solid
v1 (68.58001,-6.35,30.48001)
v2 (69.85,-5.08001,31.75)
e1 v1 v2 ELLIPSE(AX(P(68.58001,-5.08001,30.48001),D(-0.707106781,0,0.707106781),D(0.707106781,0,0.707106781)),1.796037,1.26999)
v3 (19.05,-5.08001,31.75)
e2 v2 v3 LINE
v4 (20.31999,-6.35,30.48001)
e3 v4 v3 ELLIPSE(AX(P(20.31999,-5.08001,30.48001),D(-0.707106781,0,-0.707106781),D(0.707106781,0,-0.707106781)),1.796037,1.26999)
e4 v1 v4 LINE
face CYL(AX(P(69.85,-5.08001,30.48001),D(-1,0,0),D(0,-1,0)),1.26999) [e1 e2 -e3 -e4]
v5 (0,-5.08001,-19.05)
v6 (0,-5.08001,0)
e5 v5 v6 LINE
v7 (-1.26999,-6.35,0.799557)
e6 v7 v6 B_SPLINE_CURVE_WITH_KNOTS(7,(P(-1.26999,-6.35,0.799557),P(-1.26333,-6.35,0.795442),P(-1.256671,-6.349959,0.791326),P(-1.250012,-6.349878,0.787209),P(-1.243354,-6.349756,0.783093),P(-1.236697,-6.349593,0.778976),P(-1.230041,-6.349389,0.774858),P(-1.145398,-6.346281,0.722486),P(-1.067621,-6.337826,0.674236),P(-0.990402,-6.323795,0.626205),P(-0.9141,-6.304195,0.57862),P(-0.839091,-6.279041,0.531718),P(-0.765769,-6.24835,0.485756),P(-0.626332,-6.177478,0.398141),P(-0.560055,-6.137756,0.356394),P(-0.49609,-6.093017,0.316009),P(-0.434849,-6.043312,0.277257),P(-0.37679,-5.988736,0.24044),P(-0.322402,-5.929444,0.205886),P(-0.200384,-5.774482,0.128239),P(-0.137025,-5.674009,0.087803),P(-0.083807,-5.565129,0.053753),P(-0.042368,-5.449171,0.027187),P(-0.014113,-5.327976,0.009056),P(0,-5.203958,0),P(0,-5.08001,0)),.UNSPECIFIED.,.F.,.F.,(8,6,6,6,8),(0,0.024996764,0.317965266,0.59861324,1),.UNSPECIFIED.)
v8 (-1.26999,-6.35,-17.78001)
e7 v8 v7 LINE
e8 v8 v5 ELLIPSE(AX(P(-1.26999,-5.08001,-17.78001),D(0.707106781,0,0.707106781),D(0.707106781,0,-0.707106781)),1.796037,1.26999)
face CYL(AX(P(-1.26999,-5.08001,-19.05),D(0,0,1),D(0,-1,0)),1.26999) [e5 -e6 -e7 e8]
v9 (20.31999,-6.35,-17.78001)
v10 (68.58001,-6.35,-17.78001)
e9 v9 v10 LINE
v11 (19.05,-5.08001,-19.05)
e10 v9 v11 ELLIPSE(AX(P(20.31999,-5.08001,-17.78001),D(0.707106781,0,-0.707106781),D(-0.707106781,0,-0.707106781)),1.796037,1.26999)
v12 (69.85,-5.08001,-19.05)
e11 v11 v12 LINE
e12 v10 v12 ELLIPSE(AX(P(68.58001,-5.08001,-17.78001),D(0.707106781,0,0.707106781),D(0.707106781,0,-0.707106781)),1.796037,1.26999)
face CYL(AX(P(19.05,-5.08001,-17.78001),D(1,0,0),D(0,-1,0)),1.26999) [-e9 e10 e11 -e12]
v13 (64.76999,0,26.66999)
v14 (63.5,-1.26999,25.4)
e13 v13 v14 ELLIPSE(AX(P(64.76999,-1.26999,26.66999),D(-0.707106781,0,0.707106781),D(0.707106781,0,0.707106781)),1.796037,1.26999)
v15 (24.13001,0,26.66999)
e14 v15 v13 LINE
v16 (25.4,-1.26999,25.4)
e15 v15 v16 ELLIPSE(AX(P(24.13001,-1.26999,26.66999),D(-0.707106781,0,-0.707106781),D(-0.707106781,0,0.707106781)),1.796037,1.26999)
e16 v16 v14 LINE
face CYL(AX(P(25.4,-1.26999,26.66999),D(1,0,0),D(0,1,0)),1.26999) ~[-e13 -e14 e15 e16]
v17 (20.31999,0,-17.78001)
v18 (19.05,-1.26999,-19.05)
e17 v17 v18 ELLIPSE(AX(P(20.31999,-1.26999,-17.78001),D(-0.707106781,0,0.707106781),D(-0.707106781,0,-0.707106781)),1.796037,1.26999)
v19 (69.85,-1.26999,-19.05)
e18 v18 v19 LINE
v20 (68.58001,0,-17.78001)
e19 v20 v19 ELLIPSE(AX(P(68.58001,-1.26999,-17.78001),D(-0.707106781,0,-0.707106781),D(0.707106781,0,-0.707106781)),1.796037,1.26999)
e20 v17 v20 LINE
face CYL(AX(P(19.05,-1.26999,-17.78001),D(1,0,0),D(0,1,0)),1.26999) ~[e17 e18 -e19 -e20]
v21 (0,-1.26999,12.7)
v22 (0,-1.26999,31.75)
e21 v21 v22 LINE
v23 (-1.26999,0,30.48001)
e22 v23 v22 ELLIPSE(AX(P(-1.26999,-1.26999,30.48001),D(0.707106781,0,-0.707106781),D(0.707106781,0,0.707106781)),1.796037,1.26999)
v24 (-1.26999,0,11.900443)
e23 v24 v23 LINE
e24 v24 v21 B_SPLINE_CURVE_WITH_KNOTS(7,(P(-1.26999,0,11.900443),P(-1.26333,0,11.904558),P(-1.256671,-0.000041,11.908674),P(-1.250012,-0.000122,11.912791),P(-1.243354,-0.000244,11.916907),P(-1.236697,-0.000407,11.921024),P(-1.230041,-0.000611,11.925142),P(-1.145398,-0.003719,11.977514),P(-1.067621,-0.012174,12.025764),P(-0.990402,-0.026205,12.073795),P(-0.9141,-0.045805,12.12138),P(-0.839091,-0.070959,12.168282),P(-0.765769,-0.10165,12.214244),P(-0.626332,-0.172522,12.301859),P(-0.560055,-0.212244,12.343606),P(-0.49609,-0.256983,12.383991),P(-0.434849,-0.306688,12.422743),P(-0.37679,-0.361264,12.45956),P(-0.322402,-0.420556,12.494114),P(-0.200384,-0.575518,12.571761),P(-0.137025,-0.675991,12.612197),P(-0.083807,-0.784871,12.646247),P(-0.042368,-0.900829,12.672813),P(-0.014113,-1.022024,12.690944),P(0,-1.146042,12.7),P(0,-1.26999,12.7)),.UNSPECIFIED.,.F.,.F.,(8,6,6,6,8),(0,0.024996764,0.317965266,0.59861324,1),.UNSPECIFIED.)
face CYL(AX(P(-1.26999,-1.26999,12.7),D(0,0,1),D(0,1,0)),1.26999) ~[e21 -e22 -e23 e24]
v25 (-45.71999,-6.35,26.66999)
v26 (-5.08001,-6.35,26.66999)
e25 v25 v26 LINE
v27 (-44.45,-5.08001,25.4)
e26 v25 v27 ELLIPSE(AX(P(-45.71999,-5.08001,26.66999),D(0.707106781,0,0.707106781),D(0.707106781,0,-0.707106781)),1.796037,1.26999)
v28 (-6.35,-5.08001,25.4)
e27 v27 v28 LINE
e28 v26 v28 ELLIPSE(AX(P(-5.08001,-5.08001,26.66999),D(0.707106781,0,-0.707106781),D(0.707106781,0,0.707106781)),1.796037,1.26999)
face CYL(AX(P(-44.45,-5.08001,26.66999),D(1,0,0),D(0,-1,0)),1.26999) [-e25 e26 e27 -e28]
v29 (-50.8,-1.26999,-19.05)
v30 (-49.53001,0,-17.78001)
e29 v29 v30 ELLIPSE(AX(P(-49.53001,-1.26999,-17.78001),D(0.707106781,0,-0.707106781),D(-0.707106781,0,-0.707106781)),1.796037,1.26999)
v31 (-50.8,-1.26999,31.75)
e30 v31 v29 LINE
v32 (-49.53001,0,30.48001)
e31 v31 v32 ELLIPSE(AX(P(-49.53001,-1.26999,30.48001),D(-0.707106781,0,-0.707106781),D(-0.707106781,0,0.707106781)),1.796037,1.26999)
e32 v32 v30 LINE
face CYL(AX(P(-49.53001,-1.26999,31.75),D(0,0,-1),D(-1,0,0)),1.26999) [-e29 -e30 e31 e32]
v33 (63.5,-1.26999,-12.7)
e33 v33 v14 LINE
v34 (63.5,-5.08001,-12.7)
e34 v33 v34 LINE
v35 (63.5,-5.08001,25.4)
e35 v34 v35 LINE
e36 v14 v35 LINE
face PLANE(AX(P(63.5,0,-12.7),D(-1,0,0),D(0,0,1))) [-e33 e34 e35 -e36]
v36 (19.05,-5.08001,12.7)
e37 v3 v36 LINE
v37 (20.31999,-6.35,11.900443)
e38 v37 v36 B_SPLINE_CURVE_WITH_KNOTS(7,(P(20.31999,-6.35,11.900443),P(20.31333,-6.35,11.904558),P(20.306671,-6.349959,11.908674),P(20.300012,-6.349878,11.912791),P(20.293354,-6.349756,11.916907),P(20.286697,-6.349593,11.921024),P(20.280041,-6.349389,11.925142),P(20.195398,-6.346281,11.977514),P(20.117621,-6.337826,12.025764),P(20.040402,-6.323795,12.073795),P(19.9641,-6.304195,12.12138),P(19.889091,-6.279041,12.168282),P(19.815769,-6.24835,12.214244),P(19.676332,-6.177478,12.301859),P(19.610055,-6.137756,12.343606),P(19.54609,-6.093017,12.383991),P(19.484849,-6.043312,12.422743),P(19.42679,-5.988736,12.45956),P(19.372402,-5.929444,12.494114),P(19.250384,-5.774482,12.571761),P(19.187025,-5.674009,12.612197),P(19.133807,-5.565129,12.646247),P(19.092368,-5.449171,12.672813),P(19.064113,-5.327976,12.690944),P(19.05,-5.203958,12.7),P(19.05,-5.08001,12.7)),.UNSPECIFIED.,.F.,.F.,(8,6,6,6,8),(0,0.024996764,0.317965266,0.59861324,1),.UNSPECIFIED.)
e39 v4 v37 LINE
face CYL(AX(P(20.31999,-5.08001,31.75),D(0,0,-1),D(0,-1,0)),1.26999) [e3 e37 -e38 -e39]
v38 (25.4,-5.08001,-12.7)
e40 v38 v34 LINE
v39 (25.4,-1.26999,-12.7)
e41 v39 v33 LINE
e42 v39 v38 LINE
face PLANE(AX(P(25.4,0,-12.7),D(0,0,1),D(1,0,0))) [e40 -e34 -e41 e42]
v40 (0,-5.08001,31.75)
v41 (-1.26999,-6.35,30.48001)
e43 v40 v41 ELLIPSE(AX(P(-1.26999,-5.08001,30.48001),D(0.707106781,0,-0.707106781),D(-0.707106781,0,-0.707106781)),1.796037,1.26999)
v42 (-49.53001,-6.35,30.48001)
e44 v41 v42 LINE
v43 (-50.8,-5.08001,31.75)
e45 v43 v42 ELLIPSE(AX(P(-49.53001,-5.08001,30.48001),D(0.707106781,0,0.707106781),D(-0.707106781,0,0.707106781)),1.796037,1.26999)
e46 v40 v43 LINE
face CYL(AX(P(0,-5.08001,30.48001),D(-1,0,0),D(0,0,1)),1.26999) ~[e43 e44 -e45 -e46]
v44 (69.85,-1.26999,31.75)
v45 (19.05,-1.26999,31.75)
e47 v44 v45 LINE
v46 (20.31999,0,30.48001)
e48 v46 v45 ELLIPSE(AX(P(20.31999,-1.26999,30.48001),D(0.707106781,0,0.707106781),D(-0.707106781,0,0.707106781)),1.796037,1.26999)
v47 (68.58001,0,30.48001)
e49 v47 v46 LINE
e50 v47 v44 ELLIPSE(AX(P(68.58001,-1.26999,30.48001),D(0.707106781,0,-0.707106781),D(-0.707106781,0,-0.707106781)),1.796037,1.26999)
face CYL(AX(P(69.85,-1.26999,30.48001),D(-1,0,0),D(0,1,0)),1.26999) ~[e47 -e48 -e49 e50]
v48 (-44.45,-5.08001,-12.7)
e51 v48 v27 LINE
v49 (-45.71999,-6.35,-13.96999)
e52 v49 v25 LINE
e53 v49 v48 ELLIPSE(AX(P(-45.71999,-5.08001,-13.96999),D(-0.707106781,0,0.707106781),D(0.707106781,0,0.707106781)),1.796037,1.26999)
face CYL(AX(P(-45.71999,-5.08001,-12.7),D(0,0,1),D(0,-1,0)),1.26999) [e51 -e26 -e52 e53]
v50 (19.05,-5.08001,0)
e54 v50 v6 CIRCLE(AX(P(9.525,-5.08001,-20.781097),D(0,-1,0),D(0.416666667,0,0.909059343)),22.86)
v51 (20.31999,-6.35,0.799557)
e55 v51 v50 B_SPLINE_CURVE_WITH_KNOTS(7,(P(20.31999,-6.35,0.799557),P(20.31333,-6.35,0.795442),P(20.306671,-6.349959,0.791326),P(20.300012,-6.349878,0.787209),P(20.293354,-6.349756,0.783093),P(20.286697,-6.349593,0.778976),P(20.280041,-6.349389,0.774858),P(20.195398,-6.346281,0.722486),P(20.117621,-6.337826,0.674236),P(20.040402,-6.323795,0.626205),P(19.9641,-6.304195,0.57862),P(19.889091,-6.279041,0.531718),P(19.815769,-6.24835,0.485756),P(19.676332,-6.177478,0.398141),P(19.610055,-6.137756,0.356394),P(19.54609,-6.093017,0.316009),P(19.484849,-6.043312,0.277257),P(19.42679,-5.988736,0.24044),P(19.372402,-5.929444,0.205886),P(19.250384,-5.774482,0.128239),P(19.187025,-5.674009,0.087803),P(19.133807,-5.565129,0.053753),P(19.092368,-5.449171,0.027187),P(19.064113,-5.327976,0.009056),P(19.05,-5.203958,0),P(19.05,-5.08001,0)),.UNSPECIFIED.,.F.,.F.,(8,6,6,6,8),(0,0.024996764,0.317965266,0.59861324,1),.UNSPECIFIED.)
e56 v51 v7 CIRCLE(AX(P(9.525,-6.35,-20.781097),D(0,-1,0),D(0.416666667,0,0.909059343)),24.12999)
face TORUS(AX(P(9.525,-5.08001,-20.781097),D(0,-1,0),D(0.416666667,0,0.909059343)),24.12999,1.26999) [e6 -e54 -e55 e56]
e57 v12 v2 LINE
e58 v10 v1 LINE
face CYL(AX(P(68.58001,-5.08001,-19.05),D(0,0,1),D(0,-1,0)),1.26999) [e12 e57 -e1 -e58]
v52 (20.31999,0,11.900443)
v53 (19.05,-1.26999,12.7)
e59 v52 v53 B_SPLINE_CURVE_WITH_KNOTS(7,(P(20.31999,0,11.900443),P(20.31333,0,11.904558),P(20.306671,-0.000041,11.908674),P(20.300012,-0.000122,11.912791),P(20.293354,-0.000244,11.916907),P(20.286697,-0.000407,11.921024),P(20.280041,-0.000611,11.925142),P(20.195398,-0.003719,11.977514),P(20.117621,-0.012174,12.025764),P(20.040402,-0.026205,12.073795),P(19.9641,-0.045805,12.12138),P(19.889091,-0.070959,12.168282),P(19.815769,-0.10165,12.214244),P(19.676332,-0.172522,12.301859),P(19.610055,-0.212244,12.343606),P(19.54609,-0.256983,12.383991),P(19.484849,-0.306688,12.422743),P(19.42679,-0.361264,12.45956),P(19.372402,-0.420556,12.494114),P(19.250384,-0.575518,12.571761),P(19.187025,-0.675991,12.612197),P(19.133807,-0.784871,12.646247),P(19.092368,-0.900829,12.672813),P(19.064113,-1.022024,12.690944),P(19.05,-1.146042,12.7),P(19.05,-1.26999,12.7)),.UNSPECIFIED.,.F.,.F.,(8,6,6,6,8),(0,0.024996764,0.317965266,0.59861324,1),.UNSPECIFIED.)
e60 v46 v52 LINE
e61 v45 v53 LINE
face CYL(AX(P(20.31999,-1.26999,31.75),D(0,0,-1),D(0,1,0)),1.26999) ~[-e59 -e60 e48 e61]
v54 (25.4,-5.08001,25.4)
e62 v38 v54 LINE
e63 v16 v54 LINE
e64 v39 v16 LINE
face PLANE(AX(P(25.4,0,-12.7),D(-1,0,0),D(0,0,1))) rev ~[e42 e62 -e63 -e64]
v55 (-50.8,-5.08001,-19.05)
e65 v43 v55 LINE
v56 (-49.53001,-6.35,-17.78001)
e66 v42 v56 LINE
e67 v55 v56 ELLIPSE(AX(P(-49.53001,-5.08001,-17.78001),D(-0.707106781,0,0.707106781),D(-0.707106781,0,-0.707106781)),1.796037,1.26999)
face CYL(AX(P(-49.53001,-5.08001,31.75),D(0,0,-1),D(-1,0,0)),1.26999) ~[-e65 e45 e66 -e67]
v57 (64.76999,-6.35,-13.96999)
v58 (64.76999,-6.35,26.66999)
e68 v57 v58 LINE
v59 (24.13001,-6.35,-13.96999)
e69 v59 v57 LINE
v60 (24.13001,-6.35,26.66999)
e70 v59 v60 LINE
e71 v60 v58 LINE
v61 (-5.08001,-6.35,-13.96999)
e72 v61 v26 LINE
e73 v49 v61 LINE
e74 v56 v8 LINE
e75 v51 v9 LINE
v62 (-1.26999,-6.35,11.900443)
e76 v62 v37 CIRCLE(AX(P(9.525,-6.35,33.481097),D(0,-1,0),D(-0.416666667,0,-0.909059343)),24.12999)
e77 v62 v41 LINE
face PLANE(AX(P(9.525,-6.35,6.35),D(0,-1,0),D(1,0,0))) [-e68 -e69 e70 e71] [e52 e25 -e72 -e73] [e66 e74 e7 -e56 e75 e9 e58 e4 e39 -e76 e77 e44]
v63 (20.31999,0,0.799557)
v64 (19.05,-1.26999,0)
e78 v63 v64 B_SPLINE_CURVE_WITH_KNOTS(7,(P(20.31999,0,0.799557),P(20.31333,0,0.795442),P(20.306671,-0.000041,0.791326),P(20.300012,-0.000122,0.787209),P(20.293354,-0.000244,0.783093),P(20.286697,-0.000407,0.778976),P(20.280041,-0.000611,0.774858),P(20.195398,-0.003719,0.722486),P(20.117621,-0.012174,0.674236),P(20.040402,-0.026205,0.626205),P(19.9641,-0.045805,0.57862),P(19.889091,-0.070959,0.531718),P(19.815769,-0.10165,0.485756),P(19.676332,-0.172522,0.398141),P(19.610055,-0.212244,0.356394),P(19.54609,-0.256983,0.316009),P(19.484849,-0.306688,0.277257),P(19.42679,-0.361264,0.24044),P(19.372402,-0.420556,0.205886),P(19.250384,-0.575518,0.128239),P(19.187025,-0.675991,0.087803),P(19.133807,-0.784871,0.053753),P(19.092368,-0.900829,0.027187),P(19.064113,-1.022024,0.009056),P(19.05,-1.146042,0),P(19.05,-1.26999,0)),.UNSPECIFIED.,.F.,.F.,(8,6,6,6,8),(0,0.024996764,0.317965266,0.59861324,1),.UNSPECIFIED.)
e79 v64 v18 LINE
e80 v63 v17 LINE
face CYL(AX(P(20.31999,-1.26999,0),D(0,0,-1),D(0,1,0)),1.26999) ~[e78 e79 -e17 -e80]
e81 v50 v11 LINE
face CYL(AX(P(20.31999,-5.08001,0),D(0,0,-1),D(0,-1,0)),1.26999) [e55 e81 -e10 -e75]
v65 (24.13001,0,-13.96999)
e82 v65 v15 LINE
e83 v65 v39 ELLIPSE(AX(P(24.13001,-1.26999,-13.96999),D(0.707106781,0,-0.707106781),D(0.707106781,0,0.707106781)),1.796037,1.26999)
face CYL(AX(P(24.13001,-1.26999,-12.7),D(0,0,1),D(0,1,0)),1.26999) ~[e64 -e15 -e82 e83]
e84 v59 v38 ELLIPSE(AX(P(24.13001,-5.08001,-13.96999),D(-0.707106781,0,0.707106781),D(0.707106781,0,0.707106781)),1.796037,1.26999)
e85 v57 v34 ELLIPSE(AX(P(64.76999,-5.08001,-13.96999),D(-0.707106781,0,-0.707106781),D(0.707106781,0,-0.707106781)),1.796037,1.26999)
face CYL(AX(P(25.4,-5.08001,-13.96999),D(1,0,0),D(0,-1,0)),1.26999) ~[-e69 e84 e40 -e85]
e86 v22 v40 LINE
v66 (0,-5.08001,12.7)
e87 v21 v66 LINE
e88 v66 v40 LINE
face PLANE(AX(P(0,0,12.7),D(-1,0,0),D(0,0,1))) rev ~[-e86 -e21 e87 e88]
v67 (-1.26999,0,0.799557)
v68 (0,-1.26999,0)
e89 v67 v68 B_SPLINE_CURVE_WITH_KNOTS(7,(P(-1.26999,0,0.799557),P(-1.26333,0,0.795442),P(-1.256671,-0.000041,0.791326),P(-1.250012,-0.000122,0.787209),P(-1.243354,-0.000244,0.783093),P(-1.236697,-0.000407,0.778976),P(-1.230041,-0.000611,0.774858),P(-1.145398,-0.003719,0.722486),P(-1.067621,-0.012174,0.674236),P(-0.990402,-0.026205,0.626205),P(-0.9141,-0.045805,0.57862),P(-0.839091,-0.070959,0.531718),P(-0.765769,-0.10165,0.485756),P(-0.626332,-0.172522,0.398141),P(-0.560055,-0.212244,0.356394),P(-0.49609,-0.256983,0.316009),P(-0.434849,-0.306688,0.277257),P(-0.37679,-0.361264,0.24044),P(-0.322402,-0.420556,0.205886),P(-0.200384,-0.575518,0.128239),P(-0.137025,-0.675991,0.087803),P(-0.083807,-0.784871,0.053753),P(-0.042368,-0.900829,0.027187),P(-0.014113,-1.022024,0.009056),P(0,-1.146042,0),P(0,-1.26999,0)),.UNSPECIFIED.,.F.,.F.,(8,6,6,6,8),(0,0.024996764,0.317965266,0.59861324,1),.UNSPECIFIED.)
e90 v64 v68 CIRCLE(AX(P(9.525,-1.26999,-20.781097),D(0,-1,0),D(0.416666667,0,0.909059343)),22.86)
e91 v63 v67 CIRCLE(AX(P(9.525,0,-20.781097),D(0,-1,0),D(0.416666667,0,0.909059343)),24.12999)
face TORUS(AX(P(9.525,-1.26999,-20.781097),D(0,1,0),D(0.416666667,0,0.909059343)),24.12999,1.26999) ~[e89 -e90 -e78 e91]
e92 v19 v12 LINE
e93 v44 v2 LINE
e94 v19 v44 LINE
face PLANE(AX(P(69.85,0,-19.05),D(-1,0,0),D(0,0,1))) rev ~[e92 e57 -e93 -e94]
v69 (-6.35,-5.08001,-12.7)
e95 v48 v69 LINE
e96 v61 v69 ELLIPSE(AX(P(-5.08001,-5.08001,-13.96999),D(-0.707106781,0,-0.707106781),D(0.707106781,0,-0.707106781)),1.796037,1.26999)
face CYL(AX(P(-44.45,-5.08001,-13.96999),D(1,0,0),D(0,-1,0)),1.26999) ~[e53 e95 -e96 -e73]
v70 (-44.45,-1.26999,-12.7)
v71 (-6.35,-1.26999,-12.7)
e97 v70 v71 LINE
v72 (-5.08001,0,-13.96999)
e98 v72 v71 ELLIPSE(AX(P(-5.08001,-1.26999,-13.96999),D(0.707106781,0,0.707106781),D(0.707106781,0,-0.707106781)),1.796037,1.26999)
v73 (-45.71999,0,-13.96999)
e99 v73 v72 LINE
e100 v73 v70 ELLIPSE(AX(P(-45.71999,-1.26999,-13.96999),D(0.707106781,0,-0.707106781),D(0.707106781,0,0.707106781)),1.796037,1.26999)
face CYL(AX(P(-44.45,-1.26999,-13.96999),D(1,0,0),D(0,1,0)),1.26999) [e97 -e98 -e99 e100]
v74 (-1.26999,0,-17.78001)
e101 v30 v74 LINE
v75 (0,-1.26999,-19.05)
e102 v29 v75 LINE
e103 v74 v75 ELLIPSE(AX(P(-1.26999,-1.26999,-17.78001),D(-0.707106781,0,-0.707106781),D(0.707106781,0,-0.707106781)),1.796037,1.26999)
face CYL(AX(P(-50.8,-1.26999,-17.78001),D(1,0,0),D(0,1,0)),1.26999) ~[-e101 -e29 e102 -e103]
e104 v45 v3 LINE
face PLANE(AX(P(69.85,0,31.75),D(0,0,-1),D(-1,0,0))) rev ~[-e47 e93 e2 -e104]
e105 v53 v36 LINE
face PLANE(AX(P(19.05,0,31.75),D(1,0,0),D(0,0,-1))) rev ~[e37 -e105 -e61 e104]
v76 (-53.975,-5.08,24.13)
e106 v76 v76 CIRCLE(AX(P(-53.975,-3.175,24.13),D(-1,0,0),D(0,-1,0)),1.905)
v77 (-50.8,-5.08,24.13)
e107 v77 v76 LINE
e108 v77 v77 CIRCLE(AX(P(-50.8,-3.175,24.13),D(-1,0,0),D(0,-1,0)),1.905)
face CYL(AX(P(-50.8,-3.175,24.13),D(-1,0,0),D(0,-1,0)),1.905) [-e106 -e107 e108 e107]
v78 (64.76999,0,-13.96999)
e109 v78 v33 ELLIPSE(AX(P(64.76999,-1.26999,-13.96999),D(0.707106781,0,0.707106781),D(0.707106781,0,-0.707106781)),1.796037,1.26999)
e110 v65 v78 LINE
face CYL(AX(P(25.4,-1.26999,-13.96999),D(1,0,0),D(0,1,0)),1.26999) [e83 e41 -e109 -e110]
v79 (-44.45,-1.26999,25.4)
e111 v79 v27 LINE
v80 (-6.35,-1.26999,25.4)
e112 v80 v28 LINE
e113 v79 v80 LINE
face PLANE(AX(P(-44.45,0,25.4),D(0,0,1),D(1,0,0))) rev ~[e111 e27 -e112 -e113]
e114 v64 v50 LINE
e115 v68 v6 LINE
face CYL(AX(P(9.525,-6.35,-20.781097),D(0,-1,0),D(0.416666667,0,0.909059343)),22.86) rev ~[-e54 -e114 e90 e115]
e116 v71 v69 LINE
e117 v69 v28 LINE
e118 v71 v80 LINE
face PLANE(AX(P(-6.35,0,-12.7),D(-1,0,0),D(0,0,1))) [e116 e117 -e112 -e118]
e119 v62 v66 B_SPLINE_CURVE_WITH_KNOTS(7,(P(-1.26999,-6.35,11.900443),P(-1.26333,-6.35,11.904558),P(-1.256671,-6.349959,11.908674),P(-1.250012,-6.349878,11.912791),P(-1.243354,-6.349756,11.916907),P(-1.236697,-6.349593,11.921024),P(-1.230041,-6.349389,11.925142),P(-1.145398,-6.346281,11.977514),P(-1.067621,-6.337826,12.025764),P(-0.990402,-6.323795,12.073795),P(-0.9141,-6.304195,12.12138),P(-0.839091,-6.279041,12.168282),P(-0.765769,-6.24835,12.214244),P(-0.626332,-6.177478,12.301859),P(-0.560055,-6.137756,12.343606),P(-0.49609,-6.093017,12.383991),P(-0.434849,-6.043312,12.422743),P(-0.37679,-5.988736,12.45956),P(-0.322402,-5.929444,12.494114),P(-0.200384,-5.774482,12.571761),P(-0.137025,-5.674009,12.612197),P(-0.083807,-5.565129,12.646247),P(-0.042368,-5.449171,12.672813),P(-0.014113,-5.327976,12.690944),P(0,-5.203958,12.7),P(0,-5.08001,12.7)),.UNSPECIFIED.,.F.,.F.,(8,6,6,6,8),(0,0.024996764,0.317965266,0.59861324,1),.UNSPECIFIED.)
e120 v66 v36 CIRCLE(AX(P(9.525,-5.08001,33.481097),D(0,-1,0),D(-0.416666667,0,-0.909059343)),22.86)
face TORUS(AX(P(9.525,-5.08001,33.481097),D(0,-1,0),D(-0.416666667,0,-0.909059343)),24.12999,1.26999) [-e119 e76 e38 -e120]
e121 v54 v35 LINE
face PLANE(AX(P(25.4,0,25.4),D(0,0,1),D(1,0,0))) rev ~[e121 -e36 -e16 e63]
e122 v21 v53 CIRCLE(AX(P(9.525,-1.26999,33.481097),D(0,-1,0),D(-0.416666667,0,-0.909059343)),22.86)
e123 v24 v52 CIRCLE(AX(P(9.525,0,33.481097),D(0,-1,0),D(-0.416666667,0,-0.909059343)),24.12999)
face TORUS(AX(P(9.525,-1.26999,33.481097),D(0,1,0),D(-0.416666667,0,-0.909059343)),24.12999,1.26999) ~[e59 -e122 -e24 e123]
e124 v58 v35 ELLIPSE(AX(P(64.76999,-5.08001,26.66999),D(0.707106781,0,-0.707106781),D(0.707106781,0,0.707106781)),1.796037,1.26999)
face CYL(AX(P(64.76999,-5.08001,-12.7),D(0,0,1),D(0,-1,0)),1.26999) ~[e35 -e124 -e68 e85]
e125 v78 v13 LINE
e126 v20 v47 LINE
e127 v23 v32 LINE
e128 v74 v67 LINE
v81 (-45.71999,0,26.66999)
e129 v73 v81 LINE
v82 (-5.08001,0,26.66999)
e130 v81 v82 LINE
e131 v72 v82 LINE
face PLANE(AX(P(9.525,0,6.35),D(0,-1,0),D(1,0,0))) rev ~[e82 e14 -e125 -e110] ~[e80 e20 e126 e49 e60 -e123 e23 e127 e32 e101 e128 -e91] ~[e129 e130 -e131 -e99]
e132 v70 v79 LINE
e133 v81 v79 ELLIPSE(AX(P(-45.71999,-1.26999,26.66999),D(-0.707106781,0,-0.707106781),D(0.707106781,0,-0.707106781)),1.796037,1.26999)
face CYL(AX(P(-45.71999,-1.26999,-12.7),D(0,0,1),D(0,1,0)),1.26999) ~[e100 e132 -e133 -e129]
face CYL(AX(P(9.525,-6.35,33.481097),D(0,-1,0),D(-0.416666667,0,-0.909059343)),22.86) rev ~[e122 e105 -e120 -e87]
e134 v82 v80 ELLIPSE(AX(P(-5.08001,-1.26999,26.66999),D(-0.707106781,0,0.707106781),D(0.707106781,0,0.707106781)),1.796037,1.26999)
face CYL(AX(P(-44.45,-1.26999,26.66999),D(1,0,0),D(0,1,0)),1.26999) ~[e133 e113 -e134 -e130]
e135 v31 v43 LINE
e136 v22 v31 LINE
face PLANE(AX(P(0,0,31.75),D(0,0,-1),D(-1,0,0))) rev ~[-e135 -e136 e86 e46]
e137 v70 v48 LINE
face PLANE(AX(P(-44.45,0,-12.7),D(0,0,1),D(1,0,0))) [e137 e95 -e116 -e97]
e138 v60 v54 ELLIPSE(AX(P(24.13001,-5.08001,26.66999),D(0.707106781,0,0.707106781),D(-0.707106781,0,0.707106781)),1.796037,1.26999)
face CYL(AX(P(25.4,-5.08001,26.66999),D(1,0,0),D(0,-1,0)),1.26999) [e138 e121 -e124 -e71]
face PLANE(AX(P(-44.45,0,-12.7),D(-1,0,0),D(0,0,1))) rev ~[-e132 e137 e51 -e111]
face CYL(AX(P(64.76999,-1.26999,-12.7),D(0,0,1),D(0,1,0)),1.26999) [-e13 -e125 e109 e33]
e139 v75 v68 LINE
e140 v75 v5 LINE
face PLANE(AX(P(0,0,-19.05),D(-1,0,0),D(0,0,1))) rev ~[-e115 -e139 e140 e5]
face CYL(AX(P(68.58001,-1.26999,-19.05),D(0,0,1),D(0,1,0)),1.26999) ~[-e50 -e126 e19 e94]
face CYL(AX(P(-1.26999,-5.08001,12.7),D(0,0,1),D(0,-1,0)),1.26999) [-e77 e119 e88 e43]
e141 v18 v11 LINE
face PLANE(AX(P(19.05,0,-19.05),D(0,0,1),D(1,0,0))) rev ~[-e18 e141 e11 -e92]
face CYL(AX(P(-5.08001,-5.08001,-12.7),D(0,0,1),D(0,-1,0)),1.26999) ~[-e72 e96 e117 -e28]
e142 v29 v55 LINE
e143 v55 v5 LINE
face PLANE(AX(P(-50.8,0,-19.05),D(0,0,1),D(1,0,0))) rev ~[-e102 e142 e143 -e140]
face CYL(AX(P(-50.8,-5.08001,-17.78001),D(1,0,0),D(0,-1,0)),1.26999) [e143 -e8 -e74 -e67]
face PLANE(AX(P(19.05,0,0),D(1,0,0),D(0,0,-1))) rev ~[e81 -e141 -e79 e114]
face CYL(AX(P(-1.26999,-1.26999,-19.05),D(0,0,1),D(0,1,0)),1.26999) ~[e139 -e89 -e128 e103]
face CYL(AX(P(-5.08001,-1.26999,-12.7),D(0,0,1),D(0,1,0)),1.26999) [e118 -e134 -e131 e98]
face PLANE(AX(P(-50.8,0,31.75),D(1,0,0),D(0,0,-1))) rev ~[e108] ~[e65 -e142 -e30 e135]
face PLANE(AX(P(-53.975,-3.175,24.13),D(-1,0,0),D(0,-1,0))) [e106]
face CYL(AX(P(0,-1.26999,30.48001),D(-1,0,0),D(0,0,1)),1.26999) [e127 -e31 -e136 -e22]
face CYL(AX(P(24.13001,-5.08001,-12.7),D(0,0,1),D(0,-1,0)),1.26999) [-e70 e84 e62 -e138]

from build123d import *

# Parameters (mm, degrees)
F0_W     = 38.1
F0_H     = 38.1
F1_DEPTH = 6.35
F4_DEPTH = 6.35
F5_DEPTH = 6.351
F2_R     = 1.905
F6_DEPTH = 3.175
F7_R     = 1.26999


# Not quite as in the source:
# - a fillet or chamfer is up to 0.001 mm smaller than in the source, because OpenCascade refuses the exact size
# - a feature names something its author has since deleted; it is built from what else it names


with BuildPart() as f1:
    # F0 (on Front) → F1 (new body)
    with BuildSketch(Plane.XZ):
        Polygon((0, 12.7), (0, 31.75), (-50.8, 31.75), (-50.8, -19.05), (0, -19.05), (0, 0), (19.05, 0), (19.05, -19.05), (69.85, -19.05), (69.85, 31.75), (19.05, 31.75), (19.05, 12.7), align=None)
        with Locations((-25.4, 6.35)):
            Rectangle(F0_W, F0_H, mode=Mode.SUBTRACT)
        with Locations((44.45, 6.35)):
            Rectangle(F0_W, F0_H, mode=Mode.SUBTRACT)
    extrude(amount=F1_DEPTH)

    # F3 (on face) → F4 (join)
    with BuildSketch(Plane.XZ.offset(6.35)):
        with BuildLine():
            Line((0, 0), (19.05, 0))
            ThreePointArc((19.05, 0), (9.525, 2.0789034216), (0, 0))
        make_face()
        with BuildLine():
            Line((19.05, 12.7), (0, 12.7))
            ThreePointArc((0, 12.7), (9.525, 10.6210965784), (19.05, 12.7))
        make_face()
    extrude(amount=-F4_DEPTH)

    # F3 (on face) → F5 (cut, through all)
    with BuildSketch(Plane.XZ.offset(6.35)):
        with BuildLine():
            Line((0, 0), (19.05, 0))
            ThreePointArc((19.05, 0), (9.525, 2.0789034216), (0, 0))
        make_face()
        with BuildLine():
            Line((19.05, 12.7), (0, 12.7))
            ThreePointArc((0, 12.7), (9.525, 10.6210965784), (19.05, 12.7))
        make_face()
    extrude(amount=-F5_DEPTH, mode=Mode.SUBTRACT)

    # F2 (on face) → F6 (join, symmetric)
    with BuildSketch(Plane(origin=(-50.8, 0, 0), x_dir=(0, -1, 0), z_dir=(-1, 0, 0))):
        with Locations((3.175, 24.13)):
            Circle(F2_R)
    extrude(amount=F6_DEPTH, both=True)

    # F7 (radius 1.27 in the source; OpenCascade refuses exactly that, so slightly less here)
    f7_edges = [f1.edges().sort_by_distance(p)[0] for p in [
        (-25.4, -6.35, 31.75),
        (-50.8, -6.35, 6.35),
        (-25.4, -6.35, -19.05),
        (0, -6.35, -9.525),
        (0, -6.35, 22.225),
        (19.05, -6.35, 22.225),
        (19.05, -6.35, -9.525),
        (44.45, -6.35, -19.05),
        (69.85, -6.35, 6.35),
        (44.45, -6.35, 31.75),
        (44.45, 0, 31.75),
        (19.05, 0, 22.225),
        (0, 0, 22.225),
        (-25.4, 0, 31.75),
        (-50.8, 0, 6.35),
        (-25.4, 0, -19.05),
        (0, 0, -9.525),
        (19.05, 0, -9.525),
        (44.45, 0, -19.05),
        (69.85, 0, 6.35),
        (9.525, -6.35, 10.621097),
        (9.525, 0, 10.621097),
        (9.525, 0, 2.078903),
        (9.525, -6.35, 2.078903),
        (25.4, -6.35, 6.35),
        (25.4, 0, 6.35),
        (44.45, -6.35, -12.7),
        (44.45, 0, -12.7),
        (63.5, -6.35, 6.35),
        (63.5, 0, 6.35),
        (44.45, 0, 25.4),
        (44.45, -6.35, 25.4),
        (-25.4, -6.35, 25.4),
        (-25.4, 0, 25.4),
        (-44.45, 0, 6.35),
        (-44.45, -6.35, 6.35),
        (-25.4, 0, -12.7),
        (-25.4, -6.35, -12.7),
        (-6.35, 0, 6.35),
        (-6.35, -6.35, 6.35),
    ]]
    fillet(f7_edges, radius=F7_R)


solid = f1.part
